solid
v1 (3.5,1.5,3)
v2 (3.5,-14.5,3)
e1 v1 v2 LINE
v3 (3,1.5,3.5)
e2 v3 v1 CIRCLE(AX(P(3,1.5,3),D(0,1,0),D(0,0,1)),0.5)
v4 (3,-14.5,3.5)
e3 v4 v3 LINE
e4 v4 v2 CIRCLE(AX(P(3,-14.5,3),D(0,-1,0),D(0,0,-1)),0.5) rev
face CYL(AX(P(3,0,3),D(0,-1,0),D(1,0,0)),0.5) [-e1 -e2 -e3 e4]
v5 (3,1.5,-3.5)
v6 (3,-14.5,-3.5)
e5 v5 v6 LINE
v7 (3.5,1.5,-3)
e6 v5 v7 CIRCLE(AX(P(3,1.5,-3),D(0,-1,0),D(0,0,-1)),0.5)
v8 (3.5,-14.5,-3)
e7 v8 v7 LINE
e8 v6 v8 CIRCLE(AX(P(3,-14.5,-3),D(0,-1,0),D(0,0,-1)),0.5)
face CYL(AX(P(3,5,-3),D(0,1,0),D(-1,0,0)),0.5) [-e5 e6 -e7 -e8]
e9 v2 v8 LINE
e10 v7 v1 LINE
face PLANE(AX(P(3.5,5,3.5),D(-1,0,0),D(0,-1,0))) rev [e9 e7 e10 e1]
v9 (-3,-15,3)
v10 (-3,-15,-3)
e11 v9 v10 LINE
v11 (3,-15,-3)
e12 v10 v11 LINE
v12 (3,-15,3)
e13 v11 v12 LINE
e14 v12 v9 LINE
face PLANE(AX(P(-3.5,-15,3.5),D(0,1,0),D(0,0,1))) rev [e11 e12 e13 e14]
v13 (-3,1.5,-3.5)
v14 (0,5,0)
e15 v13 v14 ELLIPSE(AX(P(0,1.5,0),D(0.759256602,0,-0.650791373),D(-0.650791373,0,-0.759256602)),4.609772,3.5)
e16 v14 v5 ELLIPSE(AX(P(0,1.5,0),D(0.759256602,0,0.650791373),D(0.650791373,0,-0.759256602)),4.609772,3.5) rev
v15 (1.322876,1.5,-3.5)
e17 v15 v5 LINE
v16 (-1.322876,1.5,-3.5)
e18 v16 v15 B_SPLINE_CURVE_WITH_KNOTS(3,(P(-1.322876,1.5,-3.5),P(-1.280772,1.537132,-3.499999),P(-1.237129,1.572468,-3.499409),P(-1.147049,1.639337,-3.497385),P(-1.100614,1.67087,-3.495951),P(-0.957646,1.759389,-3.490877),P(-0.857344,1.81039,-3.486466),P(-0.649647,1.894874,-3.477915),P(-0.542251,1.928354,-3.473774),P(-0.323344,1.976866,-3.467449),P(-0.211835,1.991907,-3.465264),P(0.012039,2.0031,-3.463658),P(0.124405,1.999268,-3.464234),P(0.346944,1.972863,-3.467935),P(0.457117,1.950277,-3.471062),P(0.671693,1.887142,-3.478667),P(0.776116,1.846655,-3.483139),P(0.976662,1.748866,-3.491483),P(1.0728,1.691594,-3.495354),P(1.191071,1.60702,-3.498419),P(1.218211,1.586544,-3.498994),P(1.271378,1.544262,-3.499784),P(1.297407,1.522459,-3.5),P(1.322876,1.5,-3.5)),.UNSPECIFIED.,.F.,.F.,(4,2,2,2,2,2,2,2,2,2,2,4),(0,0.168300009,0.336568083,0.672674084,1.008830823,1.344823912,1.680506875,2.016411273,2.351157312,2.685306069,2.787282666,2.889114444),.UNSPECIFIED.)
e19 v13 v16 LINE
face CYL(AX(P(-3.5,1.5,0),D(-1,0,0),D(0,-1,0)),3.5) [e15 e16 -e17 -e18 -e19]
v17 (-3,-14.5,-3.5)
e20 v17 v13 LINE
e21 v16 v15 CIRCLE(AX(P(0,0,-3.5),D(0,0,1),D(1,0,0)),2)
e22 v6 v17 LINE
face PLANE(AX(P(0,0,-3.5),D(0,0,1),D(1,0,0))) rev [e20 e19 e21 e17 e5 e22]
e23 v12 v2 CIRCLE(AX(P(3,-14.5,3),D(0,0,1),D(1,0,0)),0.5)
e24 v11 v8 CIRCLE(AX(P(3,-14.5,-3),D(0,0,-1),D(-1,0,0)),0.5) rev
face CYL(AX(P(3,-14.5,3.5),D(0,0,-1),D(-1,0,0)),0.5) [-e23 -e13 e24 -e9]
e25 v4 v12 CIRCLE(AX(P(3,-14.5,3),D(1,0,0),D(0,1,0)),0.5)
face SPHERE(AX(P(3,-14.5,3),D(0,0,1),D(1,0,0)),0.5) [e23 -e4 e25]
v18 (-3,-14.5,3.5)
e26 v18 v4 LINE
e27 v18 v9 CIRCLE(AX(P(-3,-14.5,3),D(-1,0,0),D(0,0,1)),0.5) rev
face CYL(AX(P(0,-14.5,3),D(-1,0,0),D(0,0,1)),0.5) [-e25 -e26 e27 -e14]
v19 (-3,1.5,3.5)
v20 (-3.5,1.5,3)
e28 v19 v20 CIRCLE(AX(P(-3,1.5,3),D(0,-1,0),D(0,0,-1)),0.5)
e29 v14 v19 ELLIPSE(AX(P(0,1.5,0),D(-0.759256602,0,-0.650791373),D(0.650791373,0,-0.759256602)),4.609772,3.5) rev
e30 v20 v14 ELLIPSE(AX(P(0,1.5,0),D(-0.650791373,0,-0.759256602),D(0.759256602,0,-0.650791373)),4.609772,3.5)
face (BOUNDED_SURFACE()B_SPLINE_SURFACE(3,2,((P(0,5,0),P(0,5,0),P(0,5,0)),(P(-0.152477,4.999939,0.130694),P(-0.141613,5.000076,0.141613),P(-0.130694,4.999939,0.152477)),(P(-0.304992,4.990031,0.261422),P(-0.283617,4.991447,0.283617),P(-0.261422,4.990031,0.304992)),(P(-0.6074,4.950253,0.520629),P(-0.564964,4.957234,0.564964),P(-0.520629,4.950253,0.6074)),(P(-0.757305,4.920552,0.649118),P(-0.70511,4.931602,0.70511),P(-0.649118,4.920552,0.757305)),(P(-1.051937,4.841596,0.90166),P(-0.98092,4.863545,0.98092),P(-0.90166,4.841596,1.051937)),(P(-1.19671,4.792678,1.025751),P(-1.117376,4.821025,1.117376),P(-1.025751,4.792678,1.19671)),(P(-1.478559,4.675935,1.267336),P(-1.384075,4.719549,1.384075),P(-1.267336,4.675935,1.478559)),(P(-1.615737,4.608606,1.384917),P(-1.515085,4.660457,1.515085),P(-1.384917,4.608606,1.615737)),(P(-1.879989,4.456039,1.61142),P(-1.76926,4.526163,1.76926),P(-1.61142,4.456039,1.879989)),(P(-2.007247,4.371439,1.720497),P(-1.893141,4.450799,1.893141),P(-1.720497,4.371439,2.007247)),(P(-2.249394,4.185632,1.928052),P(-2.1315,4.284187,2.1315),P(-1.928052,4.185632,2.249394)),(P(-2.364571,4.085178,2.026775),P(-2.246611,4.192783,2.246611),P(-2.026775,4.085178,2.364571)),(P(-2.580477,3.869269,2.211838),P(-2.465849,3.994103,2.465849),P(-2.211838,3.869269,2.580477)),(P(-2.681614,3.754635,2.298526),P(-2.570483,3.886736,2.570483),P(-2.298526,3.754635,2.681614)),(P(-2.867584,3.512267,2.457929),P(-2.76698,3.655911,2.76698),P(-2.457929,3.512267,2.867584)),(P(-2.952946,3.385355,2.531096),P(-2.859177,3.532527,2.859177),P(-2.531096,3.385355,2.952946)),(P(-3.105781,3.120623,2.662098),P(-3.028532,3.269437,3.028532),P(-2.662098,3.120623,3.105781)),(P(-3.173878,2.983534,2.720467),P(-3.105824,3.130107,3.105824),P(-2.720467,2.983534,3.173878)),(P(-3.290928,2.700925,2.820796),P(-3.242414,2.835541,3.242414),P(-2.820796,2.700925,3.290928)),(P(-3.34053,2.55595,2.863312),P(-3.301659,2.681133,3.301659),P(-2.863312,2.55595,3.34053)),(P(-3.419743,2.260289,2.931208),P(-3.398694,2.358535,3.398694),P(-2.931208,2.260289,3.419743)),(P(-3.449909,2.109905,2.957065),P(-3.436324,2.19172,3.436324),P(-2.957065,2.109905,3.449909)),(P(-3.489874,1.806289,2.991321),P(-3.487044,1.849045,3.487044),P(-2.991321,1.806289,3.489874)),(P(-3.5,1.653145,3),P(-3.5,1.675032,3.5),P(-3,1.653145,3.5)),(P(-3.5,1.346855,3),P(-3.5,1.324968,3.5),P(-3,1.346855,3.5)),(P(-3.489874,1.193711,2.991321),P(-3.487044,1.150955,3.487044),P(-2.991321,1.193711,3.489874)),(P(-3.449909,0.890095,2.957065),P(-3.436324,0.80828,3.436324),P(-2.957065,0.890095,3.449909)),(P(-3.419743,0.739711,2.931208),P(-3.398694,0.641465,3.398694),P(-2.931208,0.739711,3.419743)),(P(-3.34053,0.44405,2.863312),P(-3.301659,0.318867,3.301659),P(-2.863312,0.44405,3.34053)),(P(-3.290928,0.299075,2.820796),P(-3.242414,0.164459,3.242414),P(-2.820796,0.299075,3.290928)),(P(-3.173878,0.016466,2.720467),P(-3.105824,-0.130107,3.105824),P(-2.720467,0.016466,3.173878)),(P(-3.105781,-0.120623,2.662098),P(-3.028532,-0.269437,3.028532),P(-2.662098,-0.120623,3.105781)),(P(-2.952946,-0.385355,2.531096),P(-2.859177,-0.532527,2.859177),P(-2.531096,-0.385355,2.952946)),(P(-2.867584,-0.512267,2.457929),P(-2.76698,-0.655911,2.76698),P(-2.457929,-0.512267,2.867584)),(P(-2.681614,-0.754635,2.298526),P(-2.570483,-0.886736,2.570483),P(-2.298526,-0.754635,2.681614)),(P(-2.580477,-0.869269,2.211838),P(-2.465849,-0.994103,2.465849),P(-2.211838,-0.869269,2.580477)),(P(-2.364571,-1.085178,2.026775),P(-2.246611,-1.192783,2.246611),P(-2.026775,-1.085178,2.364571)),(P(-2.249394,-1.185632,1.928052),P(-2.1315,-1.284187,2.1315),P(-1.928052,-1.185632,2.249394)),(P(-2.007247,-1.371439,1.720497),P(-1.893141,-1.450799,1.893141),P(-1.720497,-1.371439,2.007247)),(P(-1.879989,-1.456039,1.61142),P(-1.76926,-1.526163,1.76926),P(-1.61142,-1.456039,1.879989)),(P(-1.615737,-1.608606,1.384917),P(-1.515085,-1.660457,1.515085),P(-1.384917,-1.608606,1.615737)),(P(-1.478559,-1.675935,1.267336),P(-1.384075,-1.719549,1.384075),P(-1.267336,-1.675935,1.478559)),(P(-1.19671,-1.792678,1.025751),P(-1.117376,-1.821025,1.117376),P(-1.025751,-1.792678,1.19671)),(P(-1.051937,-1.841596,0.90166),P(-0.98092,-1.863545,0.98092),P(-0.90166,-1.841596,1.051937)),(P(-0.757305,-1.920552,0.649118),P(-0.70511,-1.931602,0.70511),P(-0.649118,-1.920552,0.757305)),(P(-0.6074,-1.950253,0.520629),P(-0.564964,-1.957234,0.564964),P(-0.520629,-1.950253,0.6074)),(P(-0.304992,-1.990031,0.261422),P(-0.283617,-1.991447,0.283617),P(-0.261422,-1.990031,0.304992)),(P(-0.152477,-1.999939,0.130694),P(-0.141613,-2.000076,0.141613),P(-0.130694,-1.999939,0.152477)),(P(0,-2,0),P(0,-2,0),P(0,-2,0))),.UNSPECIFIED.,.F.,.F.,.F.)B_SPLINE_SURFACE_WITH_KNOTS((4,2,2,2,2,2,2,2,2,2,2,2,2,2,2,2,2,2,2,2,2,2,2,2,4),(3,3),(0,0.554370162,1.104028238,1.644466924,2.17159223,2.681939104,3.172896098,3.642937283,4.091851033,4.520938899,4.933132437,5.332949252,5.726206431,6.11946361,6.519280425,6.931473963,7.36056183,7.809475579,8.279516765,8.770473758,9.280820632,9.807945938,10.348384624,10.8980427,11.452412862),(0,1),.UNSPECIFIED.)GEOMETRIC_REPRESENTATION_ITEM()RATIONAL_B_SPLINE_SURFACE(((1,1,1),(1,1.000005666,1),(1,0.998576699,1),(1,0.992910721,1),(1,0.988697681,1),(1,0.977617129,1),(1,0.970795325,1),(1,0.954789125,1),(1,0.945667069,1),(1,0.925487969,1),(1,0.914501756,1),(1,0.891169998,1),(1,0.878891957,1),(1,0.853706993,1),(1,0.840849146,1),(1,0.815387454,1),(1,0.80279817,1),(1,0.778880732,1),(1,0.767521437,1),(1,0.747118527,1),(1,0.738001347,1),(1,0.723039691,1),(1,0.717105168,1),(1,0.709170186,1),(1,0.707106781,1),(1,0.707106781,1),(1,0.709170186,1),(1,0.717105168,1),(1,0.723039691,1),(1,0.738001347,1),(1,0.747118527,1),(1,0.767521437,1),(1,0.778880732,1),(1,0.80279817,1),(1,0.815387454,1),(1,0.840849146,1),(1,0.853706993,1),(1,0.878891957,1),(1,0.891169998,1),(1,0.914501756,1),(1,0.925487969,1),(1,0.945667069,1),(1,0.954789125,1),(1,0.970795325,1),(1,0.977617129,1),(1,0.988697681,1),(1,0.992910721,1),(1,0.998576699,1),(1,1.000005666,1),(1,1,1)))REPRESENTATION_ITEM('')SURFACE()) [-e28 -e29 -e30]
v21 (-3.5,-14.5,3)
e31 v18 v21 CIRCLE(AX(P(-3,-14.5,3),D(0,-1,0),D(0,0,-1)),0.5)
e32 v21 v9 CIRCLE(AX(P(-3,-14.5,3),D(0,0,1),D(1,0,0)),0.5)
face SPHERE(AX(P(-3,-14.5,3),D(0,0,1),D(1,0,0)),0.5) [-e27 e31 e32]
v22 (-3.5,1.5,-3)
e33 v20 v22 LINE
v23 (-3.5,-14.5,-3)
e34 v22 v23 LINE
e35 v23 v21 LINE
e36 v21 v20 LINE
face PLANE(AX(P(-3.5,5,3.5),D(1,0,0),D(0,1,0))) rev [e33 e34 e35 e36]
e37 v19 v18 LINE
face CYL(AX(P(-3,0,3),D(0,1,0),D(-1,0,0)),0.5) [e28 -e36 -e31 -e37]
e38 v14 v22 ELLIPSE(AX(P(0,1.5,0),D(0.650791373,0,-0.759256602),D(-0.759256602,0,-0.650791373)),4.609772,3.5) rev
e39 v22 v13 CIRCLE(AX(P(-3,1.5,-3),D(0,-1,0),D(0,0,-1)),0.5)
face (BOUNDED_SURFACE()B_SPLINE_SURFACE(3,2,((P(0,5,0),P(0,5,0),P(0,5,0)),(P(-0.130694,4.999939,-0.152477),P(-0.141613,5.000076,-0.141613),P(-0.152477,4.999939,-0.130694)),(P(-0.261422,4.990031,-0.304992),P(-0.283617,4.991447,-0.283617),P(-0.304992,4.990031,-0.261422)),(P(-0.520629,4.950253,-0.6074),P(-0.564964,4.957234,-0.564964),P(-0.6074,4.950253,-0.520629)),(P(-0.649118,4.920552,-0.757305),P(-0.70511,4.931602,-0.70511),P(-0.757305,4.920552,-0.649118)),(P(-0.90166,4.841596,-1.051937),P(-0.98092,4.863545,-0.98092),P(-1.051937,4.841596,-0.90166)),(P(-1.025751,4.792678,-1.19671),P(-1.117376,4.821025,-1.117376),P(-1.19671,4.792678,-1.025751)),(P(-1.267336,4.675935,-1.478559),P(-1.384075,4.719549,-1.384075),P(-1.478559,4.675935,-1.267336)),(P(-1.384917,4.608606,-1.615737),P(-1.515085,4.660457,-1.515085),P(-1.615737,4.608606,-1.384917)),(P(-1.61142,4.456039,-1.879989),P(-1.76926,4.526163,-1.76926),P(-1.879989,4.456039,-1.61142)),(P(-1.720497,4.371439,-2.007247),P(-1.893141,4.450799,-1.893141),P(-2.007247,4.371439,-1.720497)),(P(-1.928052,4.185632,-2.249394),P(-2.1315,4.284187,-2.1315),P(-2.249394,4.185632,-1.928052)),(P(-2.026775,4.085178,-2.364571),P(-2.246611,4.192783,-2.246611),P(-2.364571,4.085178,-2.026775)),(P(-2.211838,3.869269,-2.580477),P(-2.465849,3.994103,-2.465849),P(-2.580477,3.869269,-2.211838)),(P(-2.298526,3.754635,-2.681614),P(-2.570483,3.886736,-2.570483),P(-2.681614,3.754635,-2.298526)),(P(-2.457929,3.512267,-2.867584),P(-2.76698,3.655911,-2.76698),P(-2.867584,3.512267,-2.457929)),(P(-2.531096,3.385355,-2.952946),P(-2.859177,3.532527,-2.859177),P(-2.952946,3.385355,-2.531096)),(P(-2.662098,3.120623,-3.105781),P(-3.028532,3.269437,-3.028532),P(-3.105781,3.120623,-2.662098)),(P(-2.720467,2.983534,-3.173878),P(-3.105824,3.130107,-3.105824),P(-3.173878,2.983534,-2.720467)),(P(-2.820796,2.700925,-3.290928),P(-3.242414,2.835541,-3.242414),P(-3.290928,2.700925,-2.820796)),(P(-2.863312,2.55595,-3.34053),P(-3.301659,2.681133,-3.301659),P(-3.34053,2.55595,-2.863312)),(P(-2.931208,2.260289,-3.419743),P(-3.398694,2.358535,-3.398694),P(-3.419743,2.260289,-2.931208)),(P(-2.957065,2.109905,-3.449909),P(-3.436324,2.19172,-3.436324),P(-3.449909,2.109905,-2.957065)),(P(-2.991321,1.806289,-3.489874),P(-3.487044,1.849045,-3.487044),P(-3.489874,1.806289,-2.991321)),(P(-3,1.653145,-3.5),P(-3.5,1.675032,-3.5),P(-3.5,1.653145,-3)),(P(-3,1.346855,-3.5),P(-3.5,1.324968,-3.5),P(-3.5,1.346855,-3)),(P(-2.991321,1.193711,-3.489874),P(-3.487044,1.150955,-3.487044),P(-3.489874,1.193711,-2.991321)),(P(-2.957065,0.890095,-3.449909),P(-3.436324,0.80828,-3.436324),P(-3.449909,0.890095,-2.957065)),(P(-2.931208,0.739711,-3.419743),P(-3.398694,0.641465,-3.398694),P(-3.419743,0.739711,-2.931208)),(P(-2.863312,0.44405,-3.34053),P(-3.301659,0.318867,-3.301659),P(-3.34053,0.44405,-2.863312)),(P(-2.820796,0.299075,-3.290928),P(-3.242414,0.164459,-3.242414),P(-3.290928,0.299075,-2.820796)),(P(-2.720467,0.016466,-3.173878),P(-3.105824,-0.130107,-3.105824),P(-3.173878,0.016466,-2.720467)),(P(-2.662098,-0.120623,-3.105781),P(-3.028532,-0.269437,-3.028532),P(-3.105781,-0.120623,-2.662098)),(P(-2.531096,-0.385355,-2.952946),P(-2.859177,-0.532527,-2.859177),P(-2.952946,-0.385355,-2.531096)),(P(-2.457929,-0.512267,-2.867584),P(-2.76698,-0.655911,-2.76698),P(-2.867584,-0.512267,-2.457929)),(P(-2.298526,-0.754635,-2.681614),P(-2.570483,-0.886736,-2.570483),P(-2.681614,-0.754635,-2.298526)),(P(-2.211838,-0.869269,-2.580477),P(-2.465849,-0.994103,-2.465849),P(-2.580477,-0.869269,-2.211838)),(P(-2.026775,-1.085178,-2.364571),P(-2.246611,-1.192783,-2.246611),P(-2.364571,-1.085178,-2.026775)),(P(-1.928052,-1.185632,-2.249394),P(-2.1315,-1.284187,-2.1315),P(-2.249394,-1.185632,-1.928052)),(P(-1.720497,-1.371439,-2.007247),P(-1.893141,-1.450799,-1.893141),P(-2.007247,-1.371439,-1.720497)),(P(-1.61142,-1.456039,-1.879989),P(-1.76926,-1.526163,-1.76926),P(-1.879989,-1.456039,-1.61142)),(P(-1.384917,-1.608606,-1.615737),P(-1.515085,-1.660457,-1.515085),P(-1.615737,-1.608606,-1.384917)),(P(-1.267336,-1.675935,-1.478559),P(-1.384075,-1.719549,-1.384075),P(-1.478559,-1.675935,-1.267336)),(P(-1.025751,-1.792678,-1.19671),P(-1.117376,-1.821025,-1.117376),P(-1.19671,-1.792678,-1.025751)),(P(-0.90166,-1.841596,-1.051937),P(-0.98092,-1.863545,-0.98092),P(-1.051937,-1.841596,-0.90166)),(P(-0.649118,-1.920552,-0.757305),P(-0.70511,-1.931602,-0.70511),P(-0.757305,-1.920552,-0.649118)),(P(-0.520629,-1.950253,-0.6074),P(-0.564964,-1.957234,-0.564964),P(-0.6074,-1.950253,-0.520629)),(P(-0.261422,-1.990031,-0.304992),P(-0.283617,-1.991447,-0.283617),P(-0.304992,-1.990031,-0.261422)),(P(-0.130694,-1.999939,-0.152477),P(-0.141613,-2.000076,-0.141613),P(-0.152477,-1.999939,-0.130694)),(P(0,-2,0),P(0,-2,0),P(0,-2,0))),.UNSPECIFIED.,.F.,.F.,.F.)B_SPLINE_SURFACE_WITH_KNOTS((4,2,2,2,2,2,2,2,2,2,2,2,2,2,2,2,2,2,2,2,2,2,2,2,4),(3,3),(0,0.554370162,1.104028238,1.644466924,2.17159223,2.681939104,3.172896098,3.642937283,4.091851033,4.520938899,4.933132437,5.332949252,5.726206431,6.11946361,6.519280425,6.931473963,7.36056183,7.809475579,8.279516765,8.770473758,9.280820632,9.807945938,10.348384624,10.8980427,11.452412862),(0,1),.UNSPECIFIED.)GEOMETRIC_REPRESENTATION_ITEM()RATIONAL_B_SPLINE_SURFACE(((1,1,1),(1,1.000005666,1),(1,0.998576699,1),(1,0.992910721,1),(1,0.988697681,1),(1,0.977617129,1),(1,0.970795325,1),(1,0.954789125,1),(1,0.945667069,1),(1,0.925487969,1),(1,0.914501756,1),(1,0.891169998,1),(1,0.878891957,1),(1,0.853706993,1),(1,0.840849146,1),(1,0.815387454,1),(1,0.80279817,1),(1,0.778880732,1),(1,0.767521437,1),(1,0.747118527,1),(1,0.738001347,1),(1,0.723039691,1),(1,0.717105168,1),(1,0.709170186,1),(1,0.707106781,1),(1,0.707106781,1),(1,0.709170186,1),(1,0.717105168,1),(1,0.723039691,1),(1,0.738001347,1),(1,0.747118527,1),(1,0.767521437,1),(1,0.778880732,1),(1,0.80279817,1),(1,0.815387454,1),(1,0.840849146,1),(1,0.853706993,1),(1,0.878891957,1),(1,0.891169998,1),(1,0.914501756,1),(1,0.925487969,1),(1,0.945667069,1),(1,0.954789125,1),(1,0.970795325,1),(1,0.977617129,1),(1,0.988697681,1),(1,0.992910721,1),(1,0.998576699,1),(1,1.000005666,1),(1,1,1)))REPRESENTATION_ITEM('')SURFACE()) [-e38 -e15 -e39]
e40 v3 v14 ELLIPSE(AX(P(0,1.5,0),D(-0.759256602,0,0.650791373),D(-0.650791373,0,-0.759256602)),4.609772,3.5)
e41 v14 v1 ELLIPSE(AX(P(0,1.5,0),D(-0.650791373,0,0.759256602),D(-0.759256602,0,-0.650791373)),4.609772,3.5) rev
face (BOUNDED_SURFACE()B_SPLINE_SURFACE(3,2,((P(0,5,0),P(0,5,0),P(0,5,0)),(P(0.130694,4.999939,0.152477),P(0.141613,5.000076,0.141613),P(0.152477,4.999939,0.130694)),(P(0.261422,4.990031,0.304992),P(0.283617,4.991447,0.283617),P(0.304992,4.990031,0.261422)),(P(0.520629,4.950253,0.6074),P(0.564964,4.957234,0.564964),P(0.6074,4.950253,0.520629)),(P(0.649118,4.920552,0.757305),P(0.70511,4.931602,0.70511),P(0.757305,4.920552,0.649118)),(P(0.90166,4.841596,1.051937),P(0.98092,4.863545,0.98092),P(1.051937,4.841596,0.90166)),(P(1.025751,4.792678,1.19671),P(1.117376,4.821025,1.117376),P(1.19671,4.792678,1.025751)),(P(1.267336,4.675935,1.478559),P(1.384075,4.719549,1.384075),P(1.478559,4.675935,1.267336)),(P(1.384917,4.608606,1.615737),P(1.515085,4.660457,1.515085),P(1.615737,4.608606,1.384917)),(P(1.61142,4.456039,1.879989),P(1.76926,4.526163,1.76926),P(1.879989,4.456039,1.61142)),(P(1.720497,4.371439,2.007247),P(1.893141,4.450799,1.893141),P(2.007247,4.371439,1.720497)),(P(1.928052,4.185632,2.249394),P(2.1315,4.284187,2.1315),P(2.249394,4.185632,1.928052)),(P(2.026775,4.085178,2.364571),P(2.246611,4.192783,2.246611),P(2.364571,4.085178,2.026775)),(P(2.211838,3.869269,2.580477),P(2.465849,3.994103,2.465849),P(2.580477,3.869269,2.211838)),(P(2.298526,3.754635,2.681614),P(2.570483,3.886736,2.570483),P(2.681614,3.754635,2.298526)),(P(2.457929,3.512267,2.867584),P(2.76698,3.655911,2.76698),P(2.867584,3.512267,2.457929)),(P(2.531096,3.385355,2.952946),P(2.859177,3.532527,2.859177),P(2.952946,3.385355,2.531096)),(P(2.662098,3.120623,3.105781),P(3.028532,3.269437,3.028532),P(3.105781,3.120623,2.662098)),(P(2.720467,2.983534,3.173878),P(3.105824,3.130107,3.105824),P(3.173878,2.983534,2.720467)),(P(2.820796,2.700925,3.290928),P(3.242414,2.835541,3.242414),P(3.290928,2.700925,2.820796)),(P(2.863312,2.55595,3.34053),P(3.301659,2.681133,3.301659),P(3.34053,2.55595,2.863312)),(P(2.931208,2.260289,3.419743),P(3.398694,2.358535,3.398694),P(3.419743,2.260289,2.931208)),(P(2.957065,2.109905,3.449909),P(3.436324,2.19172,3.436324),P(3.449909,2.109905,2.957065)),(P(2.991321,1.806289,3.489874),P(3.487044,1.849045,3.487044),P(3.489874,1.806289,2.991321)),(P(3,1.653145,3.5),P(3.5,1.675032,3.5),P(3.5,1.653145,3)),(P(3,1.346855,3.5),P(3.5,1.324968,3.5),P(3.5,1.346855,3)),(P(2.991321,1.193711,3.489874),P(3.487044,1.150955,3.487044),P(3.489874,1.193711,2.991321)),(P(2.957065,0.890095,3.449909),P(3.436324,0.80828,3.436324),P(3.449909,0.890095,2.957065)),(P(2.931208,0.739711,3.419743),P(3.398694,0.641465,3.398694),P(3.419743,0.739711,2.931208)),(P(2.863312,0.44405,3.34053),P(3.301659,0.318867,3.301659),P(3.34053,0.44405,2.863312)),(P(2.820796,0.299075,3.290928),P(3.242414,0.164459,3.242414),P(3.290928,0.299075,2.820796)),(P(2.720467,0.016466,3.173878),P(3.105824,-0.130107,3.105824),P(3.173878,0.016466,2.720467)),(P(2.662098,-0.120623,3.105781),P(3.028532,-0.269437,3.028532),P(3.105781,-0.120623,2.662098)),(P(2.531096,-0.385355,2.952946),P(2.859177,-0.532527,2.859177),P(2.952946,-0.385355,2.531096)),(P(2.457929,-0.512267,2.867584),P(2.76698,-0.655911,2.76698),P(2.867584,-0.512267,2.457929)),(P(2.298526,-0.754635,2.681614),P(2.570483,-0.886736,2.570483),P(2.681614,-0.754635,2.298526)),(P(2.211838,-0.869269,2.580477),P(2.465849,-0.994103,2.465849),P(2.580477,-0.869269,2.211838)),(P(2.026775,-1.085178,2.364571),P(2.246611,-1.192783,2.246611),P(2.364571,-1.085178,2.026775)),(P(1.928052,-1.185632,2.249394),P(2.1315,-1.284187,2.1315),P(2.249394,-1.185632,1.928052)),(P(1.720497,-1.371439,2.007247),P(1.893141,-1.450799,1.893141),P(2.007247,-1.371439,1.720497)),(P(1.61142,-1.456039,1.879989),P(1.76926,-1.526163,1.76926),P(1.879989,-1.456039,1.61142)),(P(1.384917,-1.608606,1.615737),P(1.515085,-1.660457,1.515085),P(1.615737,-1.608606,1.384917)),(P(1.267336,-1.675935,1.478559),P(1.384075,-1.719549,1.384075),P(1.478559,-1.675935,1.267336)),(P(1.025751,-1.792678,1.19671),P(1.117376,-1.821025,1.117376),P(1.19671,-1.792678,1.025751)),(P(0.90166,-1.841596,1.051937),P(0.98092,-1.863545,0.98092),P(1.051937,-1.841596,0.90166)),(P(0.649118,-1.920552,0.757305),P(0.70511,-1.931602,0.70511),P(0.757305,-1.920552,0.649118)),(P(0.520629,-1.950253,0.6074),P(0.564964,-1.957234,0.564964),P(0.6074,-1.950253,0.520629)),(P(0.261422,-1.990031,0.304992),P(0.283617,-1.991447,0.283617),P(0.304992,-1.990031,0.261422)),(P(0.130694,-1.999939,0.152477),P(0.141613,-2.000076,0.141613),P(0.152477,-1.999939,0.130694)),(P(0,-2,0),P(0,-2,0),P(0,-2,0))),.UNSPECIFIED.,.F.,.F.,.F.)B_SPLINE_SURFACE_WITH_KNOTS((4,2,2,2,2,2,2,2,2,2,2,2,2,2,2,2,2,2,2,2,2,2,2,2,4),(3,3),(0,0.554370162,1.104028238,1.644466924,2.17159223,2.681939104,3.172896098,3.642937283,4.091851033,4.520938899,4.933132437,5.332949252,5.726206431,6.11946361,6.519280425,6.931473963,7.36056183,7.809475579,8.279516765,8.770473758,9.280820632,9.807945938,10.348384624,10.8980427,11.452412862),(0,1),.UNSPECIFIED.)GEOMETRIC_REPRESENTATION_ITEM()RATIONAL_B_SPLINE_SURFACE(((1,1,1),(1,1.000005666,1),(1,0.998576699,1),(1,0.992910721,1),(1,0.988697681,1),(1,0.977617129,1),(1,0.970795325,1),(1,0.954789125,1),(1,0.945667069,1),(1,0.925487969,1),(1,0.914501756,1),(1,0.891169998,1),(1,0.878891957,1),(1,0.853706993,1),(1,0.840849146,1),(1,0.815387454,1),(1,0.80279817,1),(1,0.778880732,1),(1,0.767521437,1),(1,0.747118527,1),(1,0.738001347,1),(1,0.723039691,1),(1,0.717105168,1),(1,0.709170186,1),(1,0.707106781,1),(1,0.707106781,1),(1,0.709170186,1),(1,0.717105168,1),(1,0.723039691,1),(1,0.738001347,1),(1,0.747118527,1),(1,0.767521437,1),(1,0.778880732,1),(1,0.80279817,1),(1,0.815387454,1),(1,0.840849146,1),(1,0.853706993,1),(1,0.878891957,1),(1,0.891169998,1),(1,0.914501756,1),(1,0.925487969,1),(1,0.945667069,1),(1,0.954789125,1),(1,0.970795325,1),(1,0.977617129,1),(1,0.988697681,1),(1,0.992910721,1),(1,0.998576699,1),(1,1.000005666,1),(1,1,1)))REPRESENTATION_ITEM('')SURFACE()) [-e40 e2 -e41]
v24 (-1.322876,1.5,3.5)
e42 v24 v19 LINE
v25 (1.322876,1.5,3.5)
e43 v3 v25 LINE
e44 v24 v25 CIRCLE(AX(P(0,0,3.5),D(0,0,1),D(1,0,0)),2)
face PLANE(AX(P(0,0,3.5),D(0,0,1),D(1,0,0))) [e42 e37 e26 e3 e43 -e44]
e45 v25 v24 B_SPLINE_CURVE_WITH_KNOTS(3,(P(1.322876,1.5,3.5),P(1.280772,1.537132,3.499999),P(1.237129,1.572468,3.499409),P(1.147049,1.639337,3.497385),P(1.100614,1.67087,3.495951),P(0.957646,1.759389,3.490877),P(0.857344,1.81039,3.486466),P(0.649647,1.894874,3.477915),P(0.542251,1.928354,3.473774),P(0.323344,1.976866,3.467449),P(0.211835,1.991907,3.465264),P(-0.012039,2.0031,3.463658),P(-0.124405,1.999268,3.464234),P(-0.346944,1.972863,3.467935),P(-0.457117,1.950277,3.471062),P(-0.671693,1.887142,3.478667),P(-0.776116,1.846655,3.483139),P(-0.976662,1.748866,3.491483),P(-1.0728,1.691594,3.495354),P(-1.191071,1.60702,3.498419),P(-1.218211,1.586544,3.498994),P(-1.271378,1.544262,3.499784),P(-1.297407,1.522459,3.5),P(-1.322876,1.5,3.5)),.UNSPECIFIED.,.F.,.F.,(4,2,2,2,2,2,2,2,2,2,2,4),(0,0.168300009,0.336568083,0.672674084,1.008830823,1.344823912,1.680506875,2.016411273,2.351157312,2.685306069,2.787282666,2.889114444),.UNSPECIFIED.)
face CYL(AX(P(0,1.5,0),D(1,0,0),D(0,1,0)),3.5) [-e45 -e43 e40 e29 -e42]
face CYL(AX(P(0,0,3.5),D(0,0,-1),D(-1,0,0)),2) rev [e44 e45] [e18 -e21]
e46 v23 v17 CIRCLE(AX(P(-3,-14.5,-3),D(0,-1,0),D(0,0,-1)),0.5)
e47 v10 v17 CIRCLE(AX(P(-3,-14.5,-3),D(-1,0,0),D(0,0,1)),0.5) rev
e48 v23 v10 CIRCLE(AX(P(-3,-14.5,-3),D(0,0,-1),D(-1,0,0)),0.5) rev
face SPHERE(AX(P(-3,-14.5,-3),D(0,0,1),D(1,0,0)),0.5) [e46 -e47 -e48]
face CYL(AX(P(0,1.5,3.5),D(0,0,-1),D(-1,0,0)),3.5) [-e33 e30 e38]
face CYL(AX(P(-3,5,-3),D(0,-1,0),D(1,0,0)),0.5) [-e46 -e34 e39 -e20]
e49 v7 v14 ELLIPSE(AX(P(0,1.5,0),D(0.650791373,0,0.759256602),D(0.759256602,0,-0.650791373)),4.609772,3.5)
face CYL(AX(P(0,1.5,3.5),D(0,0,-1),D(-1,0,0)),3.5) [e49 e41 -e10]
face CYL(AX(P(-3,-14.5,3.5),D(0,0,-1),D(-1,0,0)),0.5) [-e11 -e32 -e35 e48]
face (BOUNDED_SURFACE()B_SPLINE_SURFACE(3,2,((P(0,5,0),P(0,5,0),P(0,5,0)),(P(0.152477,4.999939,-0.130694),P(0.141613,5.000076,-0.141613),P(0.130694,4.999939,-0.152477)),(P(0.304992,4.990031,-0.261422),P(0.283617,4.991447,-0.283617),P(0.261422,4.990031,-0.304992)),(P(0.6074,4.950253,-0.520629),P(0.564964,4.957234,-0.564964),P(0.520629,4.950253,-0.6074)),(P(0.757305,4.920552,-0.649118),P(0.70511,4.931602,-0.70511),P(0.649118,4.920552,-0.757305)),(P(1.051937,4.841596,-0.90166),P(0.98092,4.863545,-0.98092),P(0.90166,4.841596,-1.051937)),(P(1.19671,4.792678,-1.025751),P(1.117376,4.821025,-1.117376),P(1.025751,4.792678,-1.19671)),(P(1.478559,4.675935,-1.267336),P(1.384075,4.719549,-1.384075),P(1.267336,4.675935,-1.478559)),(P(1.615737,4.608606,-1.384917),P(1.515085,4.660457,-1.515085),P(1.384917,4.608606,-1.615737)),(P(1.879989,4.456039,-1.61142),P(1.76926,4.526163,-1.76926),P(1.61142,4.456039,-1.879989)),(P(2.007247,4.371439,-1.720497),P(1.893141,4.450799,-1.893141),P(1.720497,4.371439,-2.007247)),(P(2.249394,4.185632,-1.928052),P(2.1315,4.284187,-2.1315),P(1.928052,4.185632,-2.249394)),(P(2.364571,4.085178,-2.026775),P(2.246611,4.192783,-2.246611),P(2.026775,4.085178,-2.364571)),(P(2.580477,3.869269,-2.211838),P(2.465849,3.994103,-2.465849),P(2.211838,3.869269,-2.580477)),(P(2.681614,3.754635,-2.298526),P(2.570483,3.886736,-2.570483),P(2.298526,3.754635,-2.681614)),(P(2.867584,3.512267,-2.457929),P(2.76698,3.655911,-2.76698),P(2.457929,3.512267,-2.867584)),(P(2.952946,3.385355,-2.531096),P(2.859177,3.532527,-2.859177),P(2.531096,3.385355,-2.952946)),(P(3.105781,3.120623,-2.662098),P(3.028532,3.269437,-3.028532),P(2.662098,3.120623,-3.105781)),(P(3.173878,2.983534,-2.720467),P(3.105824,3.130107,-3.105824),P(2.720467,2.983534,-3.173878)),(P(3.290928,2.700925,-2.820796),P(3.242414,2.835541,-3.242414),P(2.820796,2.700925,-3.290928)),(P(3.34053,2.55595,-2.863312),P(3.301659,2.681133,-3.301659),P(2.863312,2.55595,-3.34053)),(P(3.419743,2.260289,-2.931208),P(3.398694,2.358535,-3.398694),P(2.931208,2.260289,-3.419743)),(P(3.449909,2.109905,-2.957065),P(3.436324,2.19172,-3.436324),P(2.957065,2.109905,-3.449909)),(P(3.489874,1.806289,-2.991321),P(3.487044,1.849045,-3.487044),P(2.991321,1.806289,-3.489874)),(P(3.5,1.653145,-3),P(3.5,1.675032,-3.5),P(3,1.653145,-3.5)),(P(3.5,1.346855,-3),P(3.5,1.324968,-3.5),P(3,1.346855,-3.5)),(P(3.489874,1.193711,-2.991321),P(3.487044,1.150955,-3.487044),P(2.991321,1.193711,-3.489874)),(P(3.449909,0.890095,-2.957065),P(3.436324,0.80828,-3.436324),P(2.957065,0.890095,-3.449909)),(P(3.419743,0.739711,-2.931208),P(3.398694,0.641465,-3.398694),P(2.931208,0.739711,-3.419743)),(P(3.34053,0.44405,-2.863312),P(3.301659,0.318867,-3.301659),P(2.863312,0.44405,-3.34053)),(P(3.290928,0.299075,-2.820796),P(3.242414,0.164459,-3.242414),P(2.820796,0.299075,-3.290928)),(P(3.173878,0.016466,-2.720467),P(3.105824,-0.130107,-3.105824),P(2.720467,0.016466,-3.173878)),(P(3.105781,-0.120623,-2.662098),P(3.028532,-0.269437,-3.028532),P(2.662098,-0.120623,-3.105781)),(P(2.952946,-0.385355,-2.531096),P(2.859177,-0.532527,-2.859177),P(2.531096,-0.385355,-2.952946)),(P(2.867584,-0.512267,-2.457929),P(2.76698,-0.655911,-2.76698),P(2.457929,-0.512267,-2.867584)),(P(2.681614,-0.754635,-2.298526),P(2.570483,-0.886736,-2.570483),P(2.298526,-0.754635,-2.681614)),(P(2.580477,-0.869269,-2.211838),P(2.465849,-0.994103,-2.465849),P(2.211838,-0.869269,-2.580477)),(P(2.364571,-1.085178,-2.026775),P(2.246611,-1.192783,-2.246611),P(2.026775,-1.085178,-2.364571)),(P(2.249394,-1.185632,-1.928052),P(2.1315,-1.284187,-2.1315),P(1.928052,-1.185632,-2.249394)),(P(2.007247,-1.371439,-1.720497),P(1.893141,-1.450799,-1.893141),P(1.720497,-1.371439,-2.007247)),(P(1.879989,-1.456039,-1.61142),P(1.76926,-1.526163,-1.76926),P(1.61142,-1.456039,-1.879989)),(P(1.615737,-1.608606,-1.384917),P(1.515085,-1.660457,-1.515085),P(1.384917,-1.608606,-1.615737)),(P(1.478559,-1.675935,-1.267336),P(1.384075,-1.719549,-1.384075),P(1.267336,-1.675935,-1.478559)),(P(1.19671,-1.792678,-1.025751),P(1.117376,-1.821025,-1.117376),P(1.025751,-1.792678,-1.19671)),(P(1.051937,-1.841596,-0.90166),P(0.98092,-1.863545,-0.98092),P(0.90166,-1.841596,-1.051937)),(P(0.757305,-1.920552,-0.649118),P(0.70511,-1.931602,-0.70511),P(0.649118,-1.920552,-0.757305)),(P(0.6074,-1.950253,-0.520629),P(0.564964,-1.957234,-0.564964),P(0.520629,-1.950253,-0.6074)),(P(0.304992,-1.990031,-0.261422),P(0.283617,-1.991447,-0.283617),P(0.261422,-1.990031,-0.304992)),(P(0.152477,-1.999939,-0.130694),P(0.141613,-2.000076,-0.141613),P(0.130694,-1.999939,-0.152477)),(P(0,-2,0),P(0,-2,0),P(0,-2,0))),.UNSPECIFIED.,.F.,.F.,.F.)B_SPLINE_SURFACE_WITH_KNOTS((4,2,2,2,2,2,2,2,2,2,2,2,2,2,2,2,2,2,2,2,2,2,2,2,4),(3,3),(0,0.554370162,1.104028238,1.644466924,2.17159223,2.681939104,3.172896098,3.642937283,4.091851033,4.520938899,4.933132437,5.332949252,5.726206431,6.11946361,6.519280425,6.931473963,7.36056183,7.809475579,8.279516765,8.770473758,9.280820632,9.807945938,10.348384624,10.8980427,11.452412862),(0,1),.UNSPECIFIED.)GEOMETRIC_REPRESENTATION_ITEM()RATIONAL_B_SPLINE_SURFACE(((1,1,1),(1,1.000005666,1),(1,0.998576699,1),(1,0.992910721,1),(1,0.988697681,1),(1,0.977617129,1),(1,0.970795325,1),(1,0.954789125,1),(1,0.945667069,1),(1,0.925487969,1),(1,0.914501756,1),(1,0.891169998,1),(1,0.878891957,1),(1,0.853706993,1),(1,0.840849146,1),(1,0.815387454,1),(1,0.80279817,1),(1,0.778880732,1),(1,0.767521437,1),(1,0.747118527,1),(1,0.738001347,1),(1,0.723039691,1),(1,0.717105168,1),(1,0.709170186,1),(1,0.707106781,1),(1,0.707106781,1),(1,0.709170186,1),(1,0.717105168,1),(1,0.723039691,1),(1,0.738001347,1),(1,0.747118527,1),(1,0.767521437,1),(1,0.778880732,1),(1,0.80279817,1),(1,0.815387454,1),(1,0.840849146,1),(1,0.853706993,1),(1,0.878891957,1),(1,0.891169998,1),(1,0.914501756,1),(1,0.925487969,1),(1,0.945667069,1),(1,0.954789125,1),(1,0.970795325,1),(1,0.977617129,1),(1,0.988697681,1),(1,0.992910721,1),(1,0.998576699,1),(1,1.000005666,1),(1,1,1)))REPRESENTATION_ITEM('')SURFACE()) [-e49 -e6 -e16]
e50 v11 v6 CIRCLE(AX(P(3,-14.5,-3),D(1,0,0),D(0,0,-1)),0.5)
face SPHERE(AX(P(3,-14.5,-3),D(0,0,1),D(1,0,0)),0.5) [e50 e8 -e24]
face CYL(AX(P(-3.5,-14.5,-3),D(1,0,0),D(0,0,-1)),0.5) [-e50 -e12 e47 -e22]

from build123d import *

# Parameters (mm, degrees)
SKETCH1_W           = 7
SKETCH1_H           = 20
SKETCH1_R           = 2
BOSS_EXTRUDE1_DEPTH = 3.5
FILLET1_R           = 3.5
FILLET2_R           = 0.5


with BuildPart() as part:
    # Sketch1 → Boss-Extrude1 (new, symmetric)
    with BuildSketch(Plane.XY):
        with Locations((0, -5)):
            Rectangle(SKETCH1_W, SKETCH1_H)
        Circle(SKETCH1_R, mode=Mode.SUBTRACT)
    extrude(amount=BOSS_EXTRUDE1_DEPTH, both=True)

    # Fillet1
    # the kernel refuses this fillet: 3.5 mm, written as the material it takes off along each edge
    with BuildSketch(Plane(origin=(-12.25, 5, 3.5), x_dir=(0, 0, -1), z_dir=(1, 0, 0)), Plane(origin=(-3.5, 5, -12.25), x_dir=(1, 0, 0), z_dir=(0, 0, 1)), Plane(origin=(3.5, 5, 12.25), x_dir=(-1, 0, 0), z_dir=(0, 0, -1))) as fillet1_piece_1:
        with BuildLine():
            CenterArc((FILLET1_R, -FILLET1_R), FILLET1_R, 90, 90)
            Line((0, -FILLET1_R), (0, 0))
            Line((0, 0), (FILLET1_R, 0))
        make_face()
    extrude(amount=24.5, mode=Mode.SUBTRACT)
    with BuildSketch(Plane(origin=(-12.25, 5, -3.5), x_dir=(0, 0, 1), z_dir=(1, 0, 0))) as fillet1_piece_2:
        with BuildLine():
            CenterArc((FILLET1_R, FILLET1_R), FILLET1_R, 180, 90)
            Line((0, FILLET1_R), (0, 0))
            Line((0, 0), (FILLET1_R, 0))
        make_face()
    extrude(amount=24.5, mode=Mode.SUBTRACT)

    # Fillet2
    fillet2_edges = [part.edges().sort_by_distance(p)[0] for p in [
        (3.5, -6.75, 3.5),
        (-3.5, -6.75, 3.5),
        (-3.5, -6.75, -3.5),
        (-2.261171176, 4.171536059, 2.261171176),
        (-2.261171176, 4.171536059, -2.261171176),
        (2.261171176, 4.171536059, 2.261171176),
        (2.261171176, 4.171536059, -2.261171176),
        (3.5, -6.75, -3.5),
        (0, -15, -3.5),
        (0, -15, 3.5),
        (3.5, -15, 0),
        (-3.5, -15, 0),
    ]]
    fillet(fillet2_edges, radius=FILLET2_R)


solid = part.part
